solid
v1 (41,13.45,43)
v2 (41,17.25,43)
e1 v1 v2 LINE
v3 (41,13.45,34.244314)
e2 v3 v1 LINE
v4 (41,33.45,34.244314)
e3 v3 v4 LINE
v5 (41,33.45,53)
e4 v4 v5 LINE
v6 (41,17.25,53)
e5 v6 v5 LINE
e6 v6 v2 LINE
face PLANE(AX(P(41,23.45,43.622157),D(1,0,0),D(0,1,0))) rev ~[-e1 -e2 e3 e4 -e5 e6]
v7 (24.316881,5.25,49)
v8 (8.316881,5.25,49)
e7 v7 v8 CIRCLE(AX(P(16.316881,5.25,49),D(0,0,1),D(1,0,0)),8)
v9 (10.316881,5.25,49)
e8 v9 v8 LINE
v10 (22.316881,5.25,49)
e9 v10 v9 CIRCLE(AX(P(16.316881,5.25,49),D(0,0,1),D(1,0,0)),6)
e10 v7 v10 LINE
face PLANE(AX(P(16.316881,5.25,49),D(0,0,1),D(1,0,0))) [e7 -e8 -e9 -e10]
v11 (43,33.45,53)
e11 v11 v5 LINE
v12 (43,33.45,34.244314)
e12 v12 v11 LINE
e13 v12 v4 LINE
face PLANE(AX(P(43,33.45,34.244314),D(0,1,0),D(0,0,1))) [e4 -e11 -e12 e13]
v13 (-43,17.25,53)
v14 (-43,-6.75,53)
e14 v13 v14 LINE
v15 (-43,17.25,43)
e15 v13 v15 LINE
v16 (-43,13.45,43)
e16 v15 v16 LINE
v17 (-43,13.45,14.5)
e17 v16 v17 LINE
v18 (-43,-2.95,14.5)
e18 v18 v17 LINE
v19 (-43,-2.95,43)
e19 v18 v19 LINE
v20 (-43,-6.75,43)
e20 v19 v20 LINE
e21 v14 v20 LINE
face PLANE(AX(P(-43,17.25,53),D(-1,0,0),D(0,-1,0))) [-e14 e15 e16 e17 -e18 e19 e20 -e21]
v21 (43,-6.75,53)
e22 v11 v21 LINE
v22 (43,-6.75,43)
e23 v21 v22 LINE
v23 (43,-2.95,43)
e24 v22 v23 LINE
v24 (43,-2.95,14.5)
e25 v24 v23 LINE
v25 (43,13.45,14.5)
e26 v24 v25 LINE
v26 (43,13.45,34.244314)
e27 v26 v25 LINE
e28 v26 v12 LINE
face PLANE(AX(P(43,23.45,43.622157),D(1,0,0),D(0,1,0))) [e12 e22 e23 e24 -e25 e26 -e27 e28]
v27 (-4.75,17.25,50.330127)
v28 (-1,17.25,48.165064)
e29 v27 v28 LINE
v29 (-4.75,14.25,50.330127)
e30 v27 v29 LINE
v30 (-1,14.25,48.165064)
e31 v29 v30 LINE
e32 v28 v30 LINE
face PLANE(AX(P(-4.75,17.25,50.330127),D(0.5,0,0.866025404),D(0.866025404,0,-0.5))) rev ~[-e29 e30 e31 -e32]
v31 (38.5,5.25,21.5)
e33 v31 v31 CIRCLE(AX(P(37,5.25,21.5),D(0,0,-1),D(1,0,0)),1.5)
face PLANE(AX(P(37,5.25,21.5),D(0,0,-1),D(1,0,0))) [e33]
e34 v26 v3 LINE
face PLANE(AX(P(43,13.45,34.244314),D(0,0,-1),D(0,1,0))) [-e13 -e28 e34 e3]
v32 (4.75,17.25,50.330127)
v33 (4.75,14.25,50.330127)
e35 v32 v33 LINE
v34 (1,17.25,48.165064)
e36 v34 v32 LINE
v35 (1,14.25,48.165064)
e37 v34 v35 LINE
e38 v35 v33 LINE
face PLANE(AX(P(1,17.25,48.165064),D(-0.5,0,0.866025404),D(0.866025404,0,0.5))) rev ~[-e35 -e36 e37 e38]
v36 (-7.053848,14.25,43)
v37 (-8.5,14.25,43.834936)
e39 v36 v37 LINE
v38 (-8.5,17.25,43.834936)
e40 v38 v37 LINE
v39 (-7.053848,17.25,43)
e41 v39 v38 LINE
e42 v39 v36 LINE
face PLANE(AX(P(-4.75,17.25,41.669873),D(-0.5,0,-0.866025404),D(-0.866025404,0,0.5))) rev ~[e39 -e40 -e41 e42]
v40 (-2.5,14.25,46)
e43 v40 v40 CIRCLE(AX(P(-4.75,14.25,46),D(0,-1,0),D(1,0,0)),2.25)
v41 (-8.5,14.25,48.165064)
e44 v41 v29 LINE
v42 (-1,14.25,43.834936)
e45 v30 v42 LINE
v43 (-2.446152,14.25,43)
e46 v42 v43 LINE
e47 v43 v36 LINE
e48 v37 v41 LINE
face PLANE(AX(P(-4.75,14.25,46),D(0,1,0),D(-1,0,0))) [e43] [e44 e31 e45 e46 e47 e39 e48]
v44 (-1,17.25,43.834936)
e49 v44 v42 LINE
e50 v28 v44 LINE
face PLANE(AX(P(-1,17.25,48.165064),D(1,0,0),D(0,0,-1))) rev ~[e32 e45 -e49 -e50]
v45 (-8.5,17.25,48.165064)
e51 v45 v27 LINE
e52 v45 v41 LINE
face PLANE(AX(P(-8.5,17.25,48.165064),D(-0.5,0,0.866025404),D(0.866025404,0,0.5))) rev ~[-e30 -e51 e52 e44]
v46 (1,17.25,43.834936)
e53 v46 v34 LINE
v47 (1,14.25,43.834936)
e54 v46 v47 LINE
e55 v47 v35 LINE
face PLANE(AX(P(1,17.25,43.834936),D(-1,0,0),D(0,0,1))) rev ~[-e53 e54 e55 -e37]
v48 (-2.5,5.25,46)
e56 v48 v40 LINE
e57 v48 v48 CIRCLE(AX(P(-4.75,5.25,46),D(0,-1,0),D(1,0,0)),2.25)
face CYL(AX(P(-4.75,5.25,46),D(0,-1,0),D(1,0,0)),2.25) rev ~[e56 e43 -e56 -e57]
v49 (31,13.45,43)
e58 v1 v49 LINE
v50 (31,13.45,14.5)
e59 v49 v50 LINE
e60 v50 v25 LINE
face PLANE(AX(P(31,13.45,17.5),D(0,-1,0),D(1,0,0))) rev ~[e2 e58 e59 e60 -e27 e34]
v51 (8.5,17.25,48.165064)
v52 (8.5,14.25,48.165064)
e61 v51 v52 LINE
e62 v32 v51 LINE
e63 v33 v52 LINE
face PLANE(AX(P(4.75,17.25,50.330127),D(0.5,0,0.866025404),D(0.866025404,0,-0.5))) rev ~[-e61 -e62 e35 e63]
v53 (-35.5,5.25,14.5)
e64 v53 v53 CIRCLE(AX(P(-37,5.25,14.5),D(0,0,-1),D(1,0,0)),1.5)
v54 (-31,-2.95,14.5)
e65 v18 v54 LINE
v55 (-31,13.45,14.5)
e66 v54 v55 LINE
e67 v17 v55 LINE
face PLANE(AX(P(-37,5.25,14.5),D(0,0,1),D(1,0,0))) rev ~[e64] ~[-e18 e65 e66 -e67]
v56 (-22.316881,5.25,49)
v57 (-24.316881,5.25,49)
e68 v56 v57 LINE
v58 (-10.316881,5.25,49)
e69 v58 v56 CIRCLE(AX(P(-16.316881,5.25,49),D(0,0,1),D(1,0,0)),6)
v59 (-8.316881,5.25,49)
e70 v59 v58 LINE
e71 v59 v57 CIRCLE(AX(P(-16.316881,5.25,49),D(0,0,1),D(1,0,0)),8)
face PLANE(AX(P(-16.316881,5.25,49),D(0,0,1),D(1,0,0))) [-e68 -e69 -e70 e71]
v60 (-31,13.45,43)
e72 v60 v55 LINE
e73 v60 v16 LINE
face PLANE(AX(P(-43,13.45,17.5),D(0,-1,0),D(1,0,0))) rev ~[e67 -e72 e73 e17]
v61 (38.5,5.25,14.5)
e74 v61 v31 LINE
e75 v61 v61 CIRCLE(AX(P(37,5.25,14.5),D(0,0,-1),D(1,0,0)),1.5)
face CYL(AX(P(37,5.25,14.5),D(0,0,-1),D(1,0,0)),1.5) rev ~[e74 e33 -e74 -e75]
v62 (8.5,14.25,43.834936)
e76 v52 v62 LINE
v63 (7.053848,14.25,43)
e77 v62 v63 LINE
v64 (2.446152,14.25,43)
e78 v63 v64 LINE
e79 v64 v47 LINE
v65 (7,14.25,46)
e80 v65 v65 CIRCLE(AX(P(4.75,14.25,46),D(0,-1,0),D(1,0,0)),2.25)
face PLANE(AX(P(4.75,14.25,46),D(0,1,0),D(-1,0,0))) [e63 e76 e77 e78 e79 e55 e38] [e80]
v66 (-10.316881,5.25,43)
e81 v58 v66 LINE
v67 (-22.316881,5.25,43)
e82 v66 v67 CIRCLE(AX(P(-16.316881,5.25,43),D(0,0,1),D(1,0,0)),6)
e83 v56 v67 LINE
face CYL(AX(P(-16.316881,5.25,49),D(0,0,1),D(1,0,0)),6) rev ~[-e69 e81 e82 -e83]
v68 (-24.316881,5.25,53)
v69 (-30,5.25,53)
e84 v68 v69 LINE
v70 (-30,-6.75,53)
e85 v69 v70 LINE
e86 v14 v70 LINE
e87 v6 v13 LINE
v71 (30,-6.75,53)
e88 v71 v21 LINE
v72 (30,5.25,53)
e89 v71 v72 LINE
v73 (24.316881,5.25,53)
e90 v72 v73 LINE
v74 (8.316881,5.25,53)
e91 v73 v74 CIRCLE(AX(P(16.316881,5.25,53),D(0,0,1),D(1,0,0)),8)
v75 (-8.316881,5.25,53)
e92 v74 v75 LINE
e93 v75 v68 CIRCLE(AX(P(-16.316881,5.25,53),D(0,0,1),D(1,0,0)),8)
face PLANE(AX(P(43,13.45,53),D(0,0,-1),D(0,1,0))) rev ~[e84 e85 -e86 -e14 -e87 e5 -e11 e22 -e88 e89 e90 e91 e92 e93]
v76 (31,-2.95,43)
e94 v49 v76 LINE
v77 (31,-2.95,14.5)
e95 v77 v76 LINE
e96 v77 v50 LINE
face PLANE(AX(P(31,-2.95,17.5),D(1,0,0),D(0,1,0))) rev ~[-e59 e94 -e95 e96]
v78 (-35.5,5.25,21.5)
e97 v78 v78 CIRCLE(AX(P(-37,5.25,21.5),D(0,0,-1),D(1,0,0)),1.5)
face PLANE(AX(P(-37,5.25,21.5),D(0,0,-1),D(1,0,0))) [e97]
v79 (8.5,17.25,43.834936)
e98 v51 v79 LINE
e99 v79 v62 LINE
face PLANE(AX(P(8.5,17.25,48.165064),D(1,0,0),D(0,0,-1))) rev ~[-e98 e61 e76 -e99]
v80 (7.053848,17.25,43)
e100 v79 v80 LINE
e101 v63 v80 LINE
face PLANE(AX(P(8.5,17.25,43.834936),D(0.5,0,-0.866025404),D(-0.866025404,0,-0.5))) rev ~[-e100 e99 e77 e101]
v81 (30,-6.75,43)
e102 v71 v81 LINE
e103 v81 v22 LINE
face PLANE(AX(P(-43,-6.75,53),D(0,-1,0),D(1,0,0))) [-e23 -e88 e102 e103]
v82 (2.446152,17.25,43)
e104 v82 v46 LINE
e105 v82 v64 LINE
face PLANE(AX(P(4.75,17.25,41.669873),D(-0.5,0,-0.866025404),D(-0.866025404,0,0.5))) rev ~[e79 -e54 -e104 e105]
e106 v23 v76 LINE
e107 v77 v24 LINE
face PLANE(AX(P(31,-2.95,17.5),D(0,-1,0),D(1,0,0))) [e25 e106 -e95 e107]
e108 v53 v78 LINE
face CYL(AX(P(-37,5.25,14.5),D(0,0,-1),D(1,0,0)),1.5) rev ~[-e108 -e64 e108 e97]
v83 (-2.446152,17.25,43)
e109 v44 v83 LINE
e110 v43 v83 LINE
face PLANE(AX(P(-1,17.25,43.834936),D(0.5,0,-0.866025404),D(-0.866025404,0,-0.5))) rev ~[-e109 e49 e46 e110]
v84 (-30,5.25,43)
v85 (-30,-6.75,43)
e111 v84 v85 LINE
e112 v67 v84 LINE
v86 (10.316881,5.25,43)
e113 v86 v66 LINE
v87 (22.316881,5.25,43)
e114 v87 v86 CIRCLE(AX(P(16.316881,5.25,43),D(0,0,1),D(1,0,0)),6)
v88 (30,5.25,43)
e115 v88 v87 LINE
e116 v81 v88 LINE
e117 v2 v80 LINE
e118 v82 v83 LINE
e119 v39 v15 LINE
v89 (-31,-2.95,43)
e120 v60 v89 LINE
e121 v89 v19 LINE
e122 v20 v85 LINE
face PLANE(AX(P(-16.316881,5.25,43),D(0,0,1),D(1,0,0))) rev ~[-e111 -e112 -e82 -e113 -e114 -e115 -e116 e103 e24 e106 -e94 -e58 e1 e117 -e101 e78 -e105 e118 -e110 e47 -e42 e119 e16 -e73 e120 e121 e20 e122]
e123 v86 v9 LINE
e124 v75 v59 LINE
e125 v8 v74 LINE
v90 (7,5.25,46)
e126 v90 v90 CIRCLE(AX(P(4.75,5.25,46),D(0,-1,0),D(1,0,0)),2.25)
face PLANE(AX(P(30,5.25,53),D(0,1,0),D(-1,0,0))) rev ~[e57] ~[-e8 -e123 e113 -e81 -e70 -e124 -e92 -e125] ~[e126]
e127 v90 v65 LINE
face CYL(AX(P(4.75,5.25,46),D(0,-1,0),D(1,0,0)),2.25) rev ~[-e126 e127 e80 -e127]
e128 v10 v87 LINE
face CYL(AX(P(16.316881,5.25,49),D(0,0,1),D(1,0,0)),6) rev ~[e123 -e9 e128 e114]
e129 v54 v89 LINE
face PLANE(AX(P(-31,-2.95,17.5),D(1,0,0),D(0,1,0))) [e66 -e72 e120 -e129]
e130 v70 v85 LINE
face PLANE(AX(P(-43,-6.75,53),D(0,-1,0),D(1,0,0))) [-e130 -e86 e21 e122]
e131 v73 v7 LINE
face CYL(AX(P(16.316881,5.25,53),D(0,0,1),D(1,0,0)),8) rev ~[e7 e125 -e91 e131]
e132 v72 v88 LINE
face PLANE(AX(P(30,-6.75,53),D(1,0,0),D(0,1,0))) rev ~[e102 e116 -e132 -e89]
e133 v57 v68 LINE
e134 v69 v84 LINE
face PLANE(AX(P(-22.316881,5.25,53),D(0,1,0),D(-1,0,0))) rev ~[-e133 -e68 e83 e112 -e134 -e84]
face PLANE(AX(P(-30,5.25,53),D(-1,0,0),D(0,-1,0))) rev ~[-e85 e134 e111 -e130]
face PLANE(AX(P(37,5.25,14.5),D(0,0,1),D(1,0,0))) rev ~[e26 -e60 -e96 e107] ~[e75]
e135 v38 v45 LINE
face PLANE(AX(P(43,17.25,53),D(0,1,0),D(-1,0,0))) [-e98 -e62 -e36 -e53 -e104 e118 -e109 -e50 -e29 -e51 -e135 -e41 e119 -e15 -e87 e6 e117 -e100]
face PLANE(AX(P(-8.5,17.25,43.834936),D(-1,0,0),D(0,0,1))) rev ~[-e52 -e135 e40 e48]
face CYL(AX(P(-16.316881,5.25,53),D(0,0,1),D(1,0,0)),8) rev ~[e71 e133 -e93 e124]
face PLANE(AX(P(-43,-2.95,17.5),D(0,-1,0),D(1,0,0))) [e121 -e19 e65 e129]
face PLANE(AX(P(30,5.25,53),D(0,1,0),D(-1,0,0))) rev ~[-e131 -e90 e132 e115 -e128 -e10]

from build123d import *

# Parameters (mm, degrees)
F0_W          = 12
F0_H          = 16.5
F0_R          = 1.6
F1_DEPTH      = 17.5
F5_W          = 12
F5_H          = 16.5
F6_DEPTH      = 3
F2_W          = 12
F2_H          = 16.4
F7_DEPTH      = 35.5
F7_DEPTH_BACK = 3
F11_W         = 50
F11_H         = 5.5
F12_DEPTH     = 90
F14_DEPTH     = 10
F15_R         = 1.5
F16_DEPTH     = 7
F17_R         = 8
F18_DEPTH     = 15
F22_R         = 8
F22_R_2       = 6
F23_DEPTH     = 6
F25_DEPTH     = 25
F26_R         = 2.25
F27_DEPTH     = 25
F28_R         = 2.25
F29_DEPTH     = 3
F30_W         = 20
F30_H         = 18.7556861639
F31_DEPTH     = 2


# Not quite as in the source:
# - a feature of the source that left no trace in its solid (it failed there, or was rolled back) is left out


with BuildPart() as f1:
    # F0 (on Top) → F1 (new body)
    with BuildSketch(Plane.XY):
        Polygon((-43, -44.5), (43, -44.5), (43, -3), (31, -3), (31, -11.5), (-31, -11.5), (-31, -3), (-43, -3), align=None)
        with Locations((37, 5.25)):
            Rectangle(F0_W, F0_H)
        with Locations((37, 5.25)):
            Circle(F0_R, mode=Mode.SUBTRACT)
        with Locations((-37, 5.25)):
            Rectangle(F0_W, F0_H)
        with Locations((-37, 5.25)):
            Circle(F0_R, mode=Mode.SUBTRACT)
        Polygon((31, 13.5), (43, 13.5), (43, 44.5), (-43, 44.5), (-43, 13.5), (-31, 13.5), (-31, 25.5), (31, 25.5), align=None)
    extrude(amount=F1_DEPTH)

    # F5 (on face) → F6 (cut)
    with BuildSketch(Plane.XY.offset(17.5)):
        with Locations((-37, 5.25)):
            Rectangle(F5_W, F5_H)
        with Locations((37, 5.25)):
            Rectangle(F5_W, F5_H)
    extrude(amount=-F6_DEPTH, mode=Mode.SUBTRACT)

    # F11 (on face) → F12 (cut)
    with BuildSketch(Plane(origin=(-43, 0, 0), x_dir=(0, -1, 0), z_dir=(-1, 0, 0))):
        with Locations((0, 2.75)):
            Rectangle(F11_W, F11_H)
    extrude(amount=-F12_DEPTH, mode=Mode.SUBTRACT)


with BuildPart() as f7:
    # F2 (on face) → F7 (new body, two sides)
    with BuildSketch(Plane.XY.offset(17.5)) as f7_sk:
        with Locations((37, 5.25)):
            Rectangle(F2_W, F2_H)
    extrude(amount=F7_DEPTH)
    extrude(f7_sk.sketch, amount=-F7_DEPTH_BACK)



with BuildPart() as f7b:
    # F2 (on face) → F7, piece 2 (new body, two sides)
    with BuildSketch(Plane.XY.offset(17.5)) as f7_2_sk:
        with Locations((-37, 5.25)):
            Rectangle(F2_W, F2_H)
    extrude(amount=F7_DEPTH)
    extrude(f7_2_sk.sketch, amount=-F7_DEPTH_BACK)


with BuildPart() as f7_1:
    add(f7.part)

    add(f7b.part)  # F14 merges F7b
    # F13 (on face) → F14 (join)
    with BuildSketch(Plane.XY.offset(53)):
        Polygon((43, -6.75), (43, 13.5), (43, 17.25), (-43, 17.25), (-43, -6.75), align=None)
    extrude(amount=-F14_DEPTH)

    # F15 (on face) → F16 (cut)
    with BuildSketch(Plane(origin=(0, 0, 14.5), x_dir=(1, 0, 0), z_dir=(0, 0, -1))):
        with Locations((-37, -5.25)):
            Circle(F15_R)
        with Locations((37, -5.25)):
            Circle(F15_R)
    extrude(amount=-F16_DEPTH, mode=Mode.SUBTRACT)

    # F17 (on face) → F18 (cut)
    with BuildSketch(Plane.XY.offset(53)):
        with Locations((16.3168814033, 5.25)):
            Circle(F17_R)
        with Locations((-16.3168814033, 5.25)):
            Circle(F17_R)
    extrude(amount=-F18_DEPTH, mode=Mode.SUBTRACT)

    # F22 (on offset) → F23 (join)
    with BuildSketch(Plane.XY.offset(49)):
        with Locations((-16.3168814033, 5.25)):
            Circle(F22_R)
        with Locations((-16.3168814033, 5.25)):
            Circle(F22_R_2, mode=Mode.SUBTRACT)
        with Locations((16.3168814033, 5.25)):
            Circle(F22_R)
        with Locations((16.3168814033, 5.25)):
            Circle(F22_R_2, mode=Mode.SUBTRACT)
    extrude(amount=-F23_DEPTH)

    # F24 (on face) → F25 (cut)
    with BuildSketch(Plane.XY.offset(53)):
        with BuildLine():
            Line((-30, 5.25), (-30, -6.75))
            Line((-30, -6.75), (30, -6.75))
            Line((30, -6.75), (30, 5.25))
            Line((30, 5.25), (-10.3168814033, 5.25))
            ThreePointArc((-10.3168814033, 5.25), (-16.3168814033, -0.75), (-22.3168814033, 5.25))
            Line((-22.3168814033, 5.25), (-30, 5.25))
        make_face()
        with BuildLine():
            ThreePointArc((-10.3168814033, 5.25), (-16.3168814033, 11.25), (-22.3168814033, 5.25))
            Line((-22.3168814033, 5.25), (-10.3168814033, 5.25))
        make_face()
        with BuildLine():
            Line((-10.3168814033, 5.25), (-22.3168814033, 5.25))
            ThreePointArc((-22.3168814033, 5.25), (-16.3168814033, -0.75), (-10.3168814033, 5.25))
        make_face()
    extrude(amount=-F25_DEPTH, mode=Mode.SUBTRACT)

    # F26 (on face) → F27 (cut)
    with BuildSketch(Plane.XZ.offset(-5.25)):
        with Locations((-4.75, 46)):
            Circle(F26_R)
        with Locations((4.75, 46)):
            Circle(F26_R)
    extrude(amount=-F27_DEPTH, mode=Mode.SUBTRACT)

    # F28 (on face) → F29 (cut)
    with BuildSketch(Plane(origin=(0, 17.25, 0), x_dir=(-1, 0, 0), z_dir=(0, 1, 0))):
        Polygon((8.5, 43.8349364905), (8.5, 48.1650635095), (4.75, 50.3301270189), (1, 48.1650635095), (1, 43.8349364905), (4.75, 41.6698729811), align=None)
        with Locations((4.75, 46)):
            Circle(F28_R, mode=Mode.SUBTRACT)
        Polygon((-1, 43.8349364905), (-1, 48.1650635095), (-4.75, 50.3301270189), (-8.5, 48.1650635095), (-8.5, 43.8349364905), (-4.75, 41.6698729811), align=None)
        with Locations((-4.75, 46)):
            Circle(F28_R, mode=Mode.SUBTRACT)
    extrude(amount=-F29_DEPTH, mode=Mode.SUBTRACT)

    # F30 (on face) → F31 (join)
    with BuildSketch(Plane.YZ.offset(43)):
        with Locations((23.45, 43.622156918)):
            Rectangle(F30_W, F30_H)
    extrude(amount=-F31_DEPTH)


solid = f7_1.part
